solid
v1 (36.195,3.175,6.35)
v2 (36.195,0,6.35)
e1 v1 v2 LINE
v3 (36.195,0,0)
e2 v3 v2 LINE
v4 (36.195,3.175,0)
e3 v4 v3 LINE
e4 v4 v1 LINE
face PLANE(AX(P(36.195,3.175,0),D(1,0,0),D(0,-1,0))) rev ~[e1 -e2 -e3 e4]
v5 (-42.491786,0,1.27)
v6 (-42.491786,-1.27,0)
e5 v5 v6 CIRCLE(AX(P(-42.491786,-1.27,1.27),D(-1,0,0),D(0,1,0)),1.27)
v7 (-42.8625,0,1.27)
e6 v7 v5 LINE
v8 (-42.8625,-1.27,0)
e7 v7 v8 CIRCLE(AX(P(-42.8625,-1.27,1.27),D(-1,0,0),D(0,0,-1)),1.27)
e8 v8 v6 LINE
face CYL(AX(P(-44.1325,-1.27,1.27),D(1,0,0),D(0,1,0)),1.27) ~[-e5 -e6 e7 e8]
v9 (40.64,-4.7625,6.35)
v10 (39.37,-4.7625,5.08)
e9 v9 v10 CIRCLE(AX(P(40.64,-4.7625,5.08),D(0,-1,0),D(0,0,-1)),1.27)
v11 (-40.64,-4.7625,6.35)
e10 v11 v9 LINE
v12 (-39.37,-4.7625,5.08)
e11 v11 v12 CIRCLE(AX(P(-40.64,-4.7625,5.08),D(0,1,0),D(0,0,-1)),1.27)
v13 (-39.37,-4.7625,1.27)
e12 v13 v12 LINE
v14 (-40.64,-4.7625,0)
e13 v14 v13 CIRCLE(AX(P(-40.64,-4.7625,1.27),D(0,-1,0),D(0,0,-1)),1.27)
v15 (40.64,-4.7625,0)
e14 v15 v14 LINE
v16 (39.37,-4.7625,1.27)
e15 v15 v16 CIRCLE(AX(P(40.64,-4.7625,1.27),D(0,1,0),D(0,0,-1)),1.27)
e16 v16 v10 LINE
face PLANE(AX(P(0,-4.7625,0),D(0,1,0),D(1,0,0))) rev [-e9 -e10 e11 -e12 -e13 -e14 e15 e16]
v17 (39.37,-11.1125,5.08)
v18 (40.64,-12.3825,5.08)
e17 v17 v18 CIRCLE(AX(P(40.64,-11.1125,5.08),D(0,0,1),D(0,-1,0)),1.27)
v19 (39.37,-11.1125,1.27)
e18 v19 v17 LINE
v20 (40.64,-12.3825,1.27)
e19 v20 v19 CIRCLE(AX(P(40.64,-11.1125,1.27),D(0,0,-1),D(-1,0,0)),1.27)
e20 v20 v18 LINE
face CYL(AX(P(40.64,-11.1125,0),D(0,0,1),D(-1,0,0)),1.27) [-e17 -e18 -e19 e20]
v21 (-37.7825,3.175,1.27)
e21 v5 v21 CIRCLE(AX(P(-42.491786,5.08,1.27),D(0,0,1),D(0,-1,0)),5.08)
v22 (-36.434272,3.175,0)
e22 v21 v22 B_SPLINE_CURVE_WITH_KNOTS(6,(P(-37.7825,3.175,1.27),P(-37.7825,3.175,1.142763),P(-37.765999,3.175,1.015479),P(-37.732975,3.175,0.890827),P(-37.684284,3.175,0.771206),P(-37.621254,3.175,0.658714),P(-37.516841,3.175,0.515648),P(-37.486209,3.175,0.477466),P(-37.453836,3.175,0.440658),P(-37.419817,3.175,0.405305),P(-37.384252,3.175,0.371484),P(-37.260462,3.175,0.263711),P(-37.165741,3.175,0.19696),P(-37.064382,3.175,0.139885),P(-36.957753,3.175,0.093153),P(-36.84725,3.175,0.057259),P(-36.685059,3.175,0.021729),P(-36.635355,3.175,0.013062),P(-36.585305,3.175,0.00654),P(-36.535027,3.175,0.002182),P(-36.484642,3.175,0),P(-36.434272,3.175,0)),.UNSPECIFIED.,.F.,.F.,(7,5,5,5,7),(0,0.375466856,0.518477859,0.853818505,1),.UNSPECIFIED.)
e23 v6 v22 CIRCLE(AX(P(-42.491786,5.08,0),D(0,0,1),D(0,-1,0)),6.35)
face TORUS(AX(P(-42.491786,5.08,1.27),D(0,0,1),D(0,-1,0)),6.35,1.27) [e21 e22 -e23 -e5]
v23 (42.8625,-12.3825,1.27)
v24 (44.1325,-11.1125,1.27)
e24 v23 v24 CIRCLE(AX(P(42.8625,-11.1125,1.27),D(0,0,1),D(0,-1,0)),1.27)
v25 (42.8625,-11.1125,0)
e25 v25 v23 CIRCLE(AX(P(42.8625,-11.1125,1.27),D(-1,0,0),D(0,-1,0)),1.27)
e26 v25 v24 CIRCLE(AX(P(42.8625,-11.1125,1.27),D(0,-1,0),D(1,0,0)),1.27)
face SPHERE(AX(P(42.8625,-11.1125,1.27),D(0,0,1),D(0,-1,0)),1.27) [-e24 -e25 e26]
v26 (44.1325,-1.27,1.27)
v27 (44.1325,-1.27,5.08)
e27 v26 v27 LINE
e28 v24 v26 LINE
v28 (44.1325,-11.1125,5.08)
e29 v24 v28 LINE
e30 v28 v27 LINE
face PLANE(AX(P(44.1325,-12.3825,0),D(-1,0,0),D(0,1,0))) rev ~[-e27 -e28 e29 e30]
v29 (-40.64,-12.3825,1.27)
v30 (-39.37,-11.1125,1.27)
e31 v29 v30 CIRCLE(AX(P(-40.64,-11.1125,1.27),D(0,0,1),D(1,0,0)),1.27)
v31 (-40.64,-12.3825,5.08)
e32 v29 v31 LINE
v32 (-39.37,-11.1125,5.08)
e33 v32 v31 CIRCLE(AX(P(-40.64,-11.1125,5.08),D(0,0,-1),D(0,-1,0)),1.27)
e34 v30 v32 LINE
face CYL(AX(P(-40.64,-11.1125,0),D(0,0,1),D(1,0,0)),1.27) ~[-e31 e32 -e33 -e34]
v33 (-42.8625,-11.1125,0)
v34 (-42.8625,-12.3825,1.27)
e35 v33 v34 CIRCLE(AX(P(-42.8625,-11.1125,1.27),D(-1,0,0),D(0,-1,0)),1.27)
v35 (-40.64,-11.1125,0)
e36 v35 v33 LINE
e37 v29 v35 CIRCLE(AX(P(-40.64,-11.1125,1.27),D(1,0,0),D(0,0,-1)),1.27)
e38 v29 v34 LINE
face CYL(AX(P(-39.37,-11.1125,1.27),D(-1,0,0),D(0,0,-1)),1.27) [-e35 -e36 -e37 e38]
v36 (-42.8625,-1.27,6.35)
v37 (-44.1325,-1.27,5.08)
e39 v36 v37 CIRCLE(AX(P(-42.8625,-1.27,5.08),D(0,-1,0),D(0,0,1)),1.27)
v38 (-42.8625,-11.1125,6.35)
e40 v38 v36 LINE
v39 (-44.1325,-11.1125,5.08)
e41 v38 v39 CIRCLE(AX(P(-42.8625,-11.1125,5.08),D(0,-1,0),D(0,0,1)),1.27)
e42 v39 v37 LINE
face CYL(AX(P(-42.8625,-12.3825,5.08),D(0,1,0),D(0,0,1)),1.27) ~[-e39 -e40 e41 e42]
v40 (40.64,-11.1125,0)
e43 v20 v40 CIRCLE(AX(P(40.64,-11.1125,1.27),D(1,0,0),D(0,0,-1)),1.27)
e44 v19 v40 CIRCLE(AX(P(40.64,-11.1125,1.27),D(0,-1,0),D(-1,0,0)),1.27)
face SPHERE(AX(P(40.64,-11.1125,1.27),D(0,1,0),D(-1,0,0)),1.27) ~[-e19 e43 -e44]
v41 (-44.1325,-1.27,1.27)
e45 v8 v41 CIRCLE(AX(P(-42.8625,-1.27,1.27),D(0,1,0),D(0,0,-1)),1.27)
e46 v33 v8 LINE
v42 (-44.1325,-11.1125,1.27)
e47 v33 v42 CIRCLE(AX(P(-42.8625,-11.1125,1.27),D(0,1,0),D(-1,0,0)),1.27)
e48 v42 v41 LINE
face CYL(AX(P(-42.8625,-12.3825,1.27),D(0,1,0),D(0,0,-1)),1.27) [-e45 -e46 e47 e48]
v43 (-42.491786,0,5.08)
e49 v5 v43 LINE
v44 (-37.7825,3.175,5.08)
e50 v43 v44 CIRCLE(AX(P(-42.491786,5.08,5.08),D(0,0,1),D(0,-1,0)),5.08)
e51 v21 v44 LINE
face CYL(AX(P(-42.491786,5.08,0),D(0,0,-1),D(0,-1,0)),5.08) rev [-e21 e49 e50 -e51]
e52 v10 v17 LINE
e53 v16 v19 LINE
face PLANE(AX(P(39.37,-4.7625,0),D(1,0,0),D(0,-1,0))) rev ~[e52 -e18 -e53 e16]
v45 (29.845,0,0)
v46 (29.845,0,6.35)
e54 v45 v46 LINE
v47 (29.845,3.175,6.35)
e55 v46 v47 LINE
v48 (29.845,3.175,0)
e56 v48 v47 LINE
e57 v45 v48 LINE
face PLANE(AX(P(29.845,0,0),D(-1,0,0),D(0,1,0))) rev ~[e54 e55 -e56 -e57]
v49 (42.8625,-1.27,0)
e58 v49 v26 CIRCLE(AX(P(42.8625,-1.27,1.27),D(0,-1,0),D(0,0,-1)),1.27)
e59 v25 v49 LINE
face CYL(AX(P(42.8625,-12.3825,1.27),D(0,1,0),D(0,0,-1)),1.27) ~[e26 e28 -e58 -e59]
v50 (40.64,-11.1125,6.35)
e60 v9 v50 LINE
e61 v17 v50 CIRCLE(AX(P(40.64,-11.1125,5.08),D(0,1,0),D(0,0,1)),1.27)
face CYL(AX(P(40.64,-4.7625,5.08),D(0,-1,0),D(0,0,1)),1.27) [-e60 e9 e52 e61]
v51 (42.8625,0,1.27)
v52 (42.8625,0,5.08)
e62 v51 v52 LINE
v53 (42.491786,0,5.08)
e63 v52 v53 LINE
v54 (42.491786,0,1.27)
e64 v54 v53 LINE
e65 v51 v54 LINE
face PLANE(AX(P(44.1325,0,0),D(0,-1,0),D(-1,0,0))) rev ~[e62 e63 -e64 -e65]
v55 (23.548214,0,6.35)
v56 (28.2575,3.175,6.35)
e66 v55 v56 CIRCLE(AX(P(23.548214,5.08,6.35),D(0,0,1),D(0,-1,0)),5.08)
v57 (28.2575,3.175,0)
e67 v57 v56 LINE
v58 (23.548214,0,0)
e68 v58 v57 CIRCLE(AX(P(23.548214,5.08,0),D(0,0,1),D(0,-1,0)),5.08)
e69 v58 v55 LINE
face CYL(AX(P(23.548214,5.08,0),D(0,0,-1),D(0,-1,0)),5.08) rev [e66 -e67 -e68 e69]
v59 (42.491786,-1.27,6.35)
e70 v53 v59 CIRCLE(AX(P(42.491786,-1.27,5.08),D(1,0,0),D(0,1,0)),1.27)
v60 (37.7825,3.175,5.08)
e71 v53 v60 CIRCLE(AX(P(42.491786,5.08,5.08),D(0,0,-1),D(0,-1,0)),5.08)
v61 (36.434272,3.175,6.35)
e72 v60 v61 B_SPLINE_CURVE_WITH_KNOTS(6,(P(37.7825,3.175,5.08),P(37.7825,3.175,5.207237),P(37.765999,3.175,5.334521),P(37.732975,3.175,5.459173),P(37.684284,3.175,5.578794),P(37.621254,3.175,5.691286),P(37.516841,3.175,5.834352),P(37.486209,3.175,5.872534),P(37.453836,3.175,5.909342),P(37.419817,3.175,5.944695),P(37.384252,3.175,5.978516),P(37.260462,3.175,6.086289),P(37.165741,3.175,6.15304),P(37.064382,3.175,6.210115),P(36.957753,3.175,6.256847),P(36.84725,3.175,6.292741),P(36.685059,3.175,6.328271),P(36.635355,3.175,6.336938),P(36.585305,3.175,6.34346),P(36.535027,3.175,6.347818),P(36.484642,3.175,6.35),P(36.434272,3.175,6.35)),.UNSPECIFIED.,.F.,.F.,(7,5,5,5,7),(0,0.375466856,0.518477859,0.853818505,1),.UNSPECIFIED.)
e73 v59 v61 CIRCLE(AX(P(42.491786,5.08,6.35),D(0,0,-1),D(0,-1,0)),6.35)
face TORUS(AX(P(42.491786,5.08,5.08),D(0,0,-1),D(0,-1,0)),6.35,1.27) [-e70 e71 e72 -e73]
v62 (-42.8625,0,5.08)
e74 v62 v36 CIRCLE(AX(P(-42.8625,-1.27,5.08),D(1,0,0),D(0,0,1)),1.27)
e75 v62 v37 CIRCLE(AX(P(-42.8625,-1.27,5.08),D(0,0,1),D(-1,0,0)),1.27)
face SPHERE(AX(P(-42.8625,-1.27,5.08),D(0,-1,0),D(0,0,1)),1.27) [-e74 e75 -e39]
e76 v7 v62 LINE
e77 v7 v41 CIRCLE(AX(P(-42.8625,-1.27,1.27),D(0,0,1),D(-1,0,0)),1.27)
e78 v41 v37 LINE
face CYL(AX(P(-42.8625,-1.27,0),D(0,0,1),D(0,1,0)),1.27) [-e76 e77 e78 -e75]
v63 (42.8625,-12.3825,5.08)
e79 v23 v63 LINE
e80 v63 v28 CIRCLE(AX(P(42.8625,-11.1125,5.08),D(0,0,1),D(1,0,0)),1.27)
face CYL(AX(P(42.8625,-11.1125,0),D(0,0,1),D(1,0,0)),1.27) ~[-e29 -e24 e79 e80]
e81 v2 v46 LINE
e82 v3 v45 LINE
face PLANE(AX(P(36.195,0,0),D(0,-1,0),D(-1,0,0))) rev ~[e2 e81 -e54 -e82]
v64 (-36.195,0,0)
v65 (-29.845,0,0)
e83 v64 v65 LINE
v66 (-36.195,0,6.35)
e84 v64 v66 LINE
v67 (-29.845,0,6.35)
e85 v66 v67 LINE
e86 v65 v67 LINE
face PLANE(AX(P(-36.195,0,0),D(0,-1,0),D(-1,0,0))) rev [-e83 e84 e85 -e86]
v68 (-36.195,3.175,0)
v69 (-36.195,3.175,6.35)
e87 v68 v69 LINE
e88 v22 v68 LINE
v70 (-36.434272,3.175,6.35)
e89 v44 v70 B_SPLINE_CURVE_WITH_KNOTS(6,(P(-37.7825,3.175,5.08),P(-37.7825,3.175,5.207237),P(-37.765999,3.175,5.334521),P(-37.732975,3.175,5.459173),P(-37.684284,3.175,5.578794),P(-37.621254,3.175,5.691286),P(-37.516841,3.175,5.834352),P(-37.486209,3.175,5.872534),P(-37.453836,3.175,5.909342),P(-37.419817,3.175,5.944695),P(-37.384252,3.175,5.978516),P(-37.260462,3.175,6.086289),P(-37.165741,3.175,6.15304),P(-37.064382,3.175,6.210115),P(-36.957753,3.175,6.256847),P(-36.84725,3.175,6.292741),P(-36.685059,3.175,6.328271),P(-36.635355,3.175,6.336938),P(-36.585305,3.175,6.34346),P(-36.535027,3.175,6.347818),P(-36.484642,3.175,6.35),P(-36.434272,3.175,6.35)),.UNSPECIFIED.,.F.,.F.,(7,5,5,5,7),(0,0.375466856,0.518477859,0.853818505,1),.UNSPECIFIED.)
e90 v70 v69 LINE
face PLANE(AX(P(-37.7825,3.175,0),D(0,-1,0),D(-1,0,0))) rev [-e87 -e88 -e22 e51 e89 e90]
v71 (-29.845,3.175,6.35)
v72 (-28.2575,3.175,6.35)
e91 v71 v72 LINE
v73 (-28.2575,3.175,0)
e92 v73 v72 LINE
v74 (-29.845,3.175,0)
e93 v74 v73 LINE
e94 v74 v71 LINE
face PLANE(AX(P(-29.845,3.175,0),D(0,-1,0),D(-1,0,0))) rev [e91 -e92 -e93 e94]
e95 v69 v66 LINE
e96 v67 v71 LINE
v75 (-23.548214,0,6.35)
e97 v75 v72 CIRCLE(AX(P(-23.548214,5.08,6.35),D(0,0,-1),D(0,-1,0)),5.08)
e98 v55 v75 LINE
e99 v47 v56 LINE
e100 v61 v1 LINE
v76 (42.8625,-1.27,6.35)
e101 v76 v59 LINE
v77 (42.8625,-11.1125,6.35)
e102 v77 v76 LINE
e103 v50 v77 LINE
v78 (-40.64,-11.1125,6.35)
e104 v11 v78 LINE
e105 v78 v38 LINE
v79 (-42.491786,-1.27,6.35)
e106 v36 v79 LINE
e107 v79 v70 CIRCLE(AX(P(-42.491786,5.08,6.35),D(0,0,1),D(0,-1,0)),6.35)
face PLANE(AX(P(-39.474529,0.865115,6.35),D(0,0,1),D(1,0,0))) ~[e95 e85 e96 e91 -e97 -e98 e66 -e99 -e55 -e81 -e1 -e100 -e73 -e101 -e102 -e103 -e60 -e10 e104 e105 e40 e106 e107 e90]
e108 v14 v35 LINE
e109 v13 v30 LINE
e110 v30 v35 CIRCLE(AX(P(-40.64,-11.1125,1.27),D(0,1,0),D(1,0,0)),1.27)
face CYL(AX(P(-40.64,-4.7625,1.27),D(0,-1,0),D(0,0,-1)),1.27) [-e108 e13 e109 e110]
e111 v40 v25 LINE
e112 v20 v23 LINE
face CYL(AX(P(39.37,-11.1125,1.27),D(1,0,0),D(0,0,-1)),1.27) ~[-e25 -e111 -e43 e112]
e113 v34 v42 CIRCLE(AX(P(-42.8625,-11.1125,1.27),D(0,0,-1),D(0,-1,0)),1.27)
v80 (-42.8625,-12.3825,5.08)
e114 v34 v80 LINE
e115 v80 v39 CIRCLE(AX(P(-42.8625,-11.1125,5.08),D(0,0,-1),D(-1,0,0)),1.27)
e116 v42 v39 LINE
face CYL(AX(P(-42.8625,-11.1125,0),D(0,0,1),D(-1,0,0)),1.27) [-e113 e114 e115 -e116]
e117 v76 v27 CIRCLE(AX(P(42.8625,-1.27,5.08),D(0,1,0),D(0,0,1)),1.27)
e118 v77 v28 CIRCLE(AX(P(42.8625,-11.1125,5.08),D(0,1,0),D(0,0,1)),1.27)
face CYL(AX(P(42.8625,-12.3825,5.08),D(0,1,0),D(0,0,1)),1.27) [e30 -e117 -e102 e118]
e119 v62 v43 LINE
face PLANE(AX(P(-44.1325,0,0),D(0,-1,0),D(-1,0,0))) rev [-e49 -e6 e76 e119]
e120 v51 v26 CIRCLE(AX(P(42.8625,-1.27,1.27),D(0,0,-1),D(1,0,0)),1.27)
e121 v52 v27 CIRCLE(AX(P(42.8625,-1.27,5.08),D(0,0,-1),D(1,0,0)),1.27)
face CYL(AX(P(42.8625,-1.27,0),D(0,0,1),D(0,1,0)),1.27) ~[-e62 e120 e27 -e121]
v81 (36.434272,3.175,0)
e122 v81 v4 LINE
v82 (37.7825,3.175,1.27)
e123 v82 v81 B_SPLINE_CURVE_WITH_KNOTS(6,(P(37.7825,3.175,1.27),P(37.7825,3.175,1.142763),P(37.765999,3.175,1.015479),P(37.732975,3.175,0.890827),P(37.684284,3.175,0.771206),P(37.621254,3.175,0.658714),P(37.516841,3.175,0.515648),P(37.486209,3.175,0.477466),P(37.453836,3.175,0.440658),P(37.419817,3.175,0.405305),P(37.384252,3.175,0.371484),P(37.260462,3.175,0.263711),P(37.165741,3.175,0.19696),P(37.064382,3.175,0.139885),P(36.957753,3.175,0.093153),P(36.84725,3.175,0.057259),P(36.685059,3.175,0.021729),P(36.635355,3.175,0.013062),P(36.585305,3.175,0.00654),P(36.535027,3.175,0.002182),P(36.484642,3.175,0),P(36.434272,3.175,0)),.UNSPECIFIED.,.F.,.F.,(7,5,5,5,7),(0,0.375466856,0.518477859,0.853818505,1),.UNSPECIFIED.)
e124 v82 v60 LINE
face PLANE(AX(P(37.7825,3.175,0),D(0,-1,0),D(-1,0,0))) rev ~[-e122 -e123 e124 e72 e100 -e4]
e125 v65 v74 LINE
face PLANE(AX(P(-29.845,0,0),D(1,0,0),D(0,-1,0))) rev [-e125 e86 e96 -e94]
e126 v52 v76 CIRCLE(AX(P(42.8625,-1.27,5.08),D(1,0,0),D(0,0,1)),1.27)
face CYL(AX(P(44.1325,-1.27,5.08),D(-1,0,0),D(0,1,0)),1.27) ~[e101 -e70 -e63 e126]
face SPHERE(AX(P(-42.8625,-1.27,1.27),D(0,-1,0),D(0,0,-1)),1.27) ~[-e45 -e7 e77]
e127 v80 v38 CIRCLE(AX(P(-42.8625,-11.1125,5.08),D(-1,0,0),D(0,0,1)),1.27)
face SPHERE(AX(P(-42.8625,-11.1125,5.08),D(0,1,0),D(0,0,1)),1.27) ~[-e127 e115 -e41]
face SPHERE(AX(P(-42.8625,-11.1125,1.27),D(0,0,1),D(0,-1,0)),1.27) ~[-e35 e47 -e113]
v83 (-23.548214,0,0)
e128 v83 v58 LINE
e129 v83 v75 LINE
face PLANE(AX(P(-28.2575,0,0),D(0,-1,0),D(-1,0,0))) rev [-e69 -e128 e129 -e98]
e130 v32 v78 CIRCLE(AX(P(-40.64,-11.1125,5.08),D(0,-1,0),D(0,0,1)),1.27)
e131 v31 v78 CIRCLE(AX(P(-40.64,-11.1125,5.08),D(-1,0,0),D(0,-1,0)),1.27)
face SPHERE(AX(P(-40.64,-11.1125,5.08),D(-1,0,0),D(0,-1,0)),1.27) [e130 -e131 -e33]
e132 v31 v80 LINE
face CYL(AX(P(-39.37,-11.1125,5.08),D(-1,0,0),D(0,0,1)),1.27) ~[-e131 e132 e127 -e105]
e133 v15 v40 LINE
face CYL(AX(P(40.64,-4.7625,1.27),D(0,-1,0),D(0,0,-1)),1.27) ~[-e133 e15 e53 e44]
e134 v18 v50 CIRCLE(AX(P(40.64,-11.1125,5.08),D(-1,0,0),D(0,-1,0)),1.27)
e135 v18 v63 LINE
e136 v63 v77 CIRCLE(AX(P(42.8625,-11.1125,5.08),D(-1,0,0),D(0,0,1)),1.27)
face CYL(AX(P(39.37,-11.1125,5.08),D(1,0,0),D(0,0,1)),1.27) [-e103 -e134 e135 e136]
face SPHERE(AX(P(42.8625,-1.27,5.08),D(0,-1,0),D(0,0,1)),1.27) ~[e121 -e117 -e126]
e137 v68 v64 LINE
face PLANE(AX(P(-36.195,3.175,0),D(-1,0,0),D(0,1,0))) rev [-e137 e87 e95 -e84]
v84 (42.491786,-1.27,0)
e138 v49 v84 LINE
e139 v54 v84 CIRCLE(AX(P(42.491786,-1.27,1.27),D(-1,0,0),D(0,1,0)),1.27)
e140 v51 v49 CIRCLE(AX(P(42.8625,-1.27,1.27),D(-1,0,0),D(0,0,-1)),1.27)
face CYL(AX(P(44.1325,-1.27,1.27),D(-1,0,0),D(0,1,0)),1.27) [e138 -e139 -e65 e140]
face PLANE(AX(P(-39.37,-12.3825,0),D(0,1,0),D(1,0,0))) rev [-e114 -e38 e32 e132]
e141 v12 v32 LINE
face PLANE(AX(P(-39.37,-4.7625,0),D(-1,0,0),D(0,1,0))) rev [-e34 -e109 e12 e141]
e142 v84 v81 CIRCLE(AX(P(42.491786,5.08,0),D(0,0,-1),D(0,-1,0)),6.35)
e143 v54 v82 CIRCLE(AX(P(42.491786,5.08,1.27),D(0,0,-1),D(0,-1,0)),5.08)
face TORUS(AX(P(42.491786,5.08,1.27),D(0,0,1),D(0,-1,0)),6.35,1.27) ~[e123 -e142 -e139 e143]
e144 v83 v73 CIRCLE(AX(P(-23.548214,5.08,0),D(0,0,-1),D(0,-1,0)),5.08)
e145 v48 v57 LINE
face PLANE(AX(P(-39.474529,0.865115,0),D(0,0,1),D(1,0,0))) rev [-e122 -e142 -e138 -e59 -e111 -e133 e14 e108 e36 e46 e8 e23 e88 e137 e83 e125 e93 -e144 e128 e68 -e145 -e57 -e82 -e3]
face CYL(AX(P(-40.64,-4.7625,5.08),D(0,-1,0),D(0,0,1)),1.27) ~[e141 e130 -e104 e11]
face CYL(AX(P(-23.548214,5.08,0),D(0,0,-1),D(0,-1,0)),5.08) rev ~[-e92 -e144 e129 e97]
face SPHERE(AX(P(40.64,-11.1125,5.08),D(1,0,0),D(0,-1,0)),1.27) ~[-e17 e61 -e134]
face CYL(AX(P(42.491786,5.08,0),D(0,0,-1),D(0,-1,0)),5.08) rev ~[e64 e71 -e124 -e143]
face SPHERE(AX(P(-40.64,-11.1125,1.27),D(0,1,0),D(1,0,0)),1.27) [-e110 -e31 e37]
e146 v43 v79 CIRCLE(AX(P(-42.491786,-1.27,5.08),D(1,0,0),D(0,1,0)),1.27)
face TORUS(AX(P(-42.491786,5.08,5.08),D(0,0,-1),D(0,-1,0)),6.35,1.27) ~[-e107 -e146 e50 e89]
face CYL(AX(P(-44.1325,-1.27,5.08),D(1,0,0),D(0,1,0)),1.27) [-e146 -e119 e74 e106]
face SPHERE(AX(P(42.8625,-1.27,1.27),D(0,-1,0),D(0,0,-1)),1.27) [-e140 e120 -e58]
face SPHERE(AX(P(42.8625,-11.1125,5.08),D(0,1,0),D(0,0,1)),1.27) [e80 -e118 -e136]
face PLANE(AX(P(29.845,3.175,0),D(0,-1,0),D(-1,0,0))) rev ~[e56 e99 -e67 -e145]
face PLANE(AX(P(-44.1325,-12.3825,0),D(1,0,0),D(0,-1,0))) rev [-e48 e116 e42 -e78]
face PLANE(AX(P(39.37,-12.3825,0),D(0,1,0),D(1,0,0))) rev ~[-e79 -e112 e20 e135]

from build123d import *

# Parameters (mm, degrees)
F1_DEPTH    = 6.35
F2_T1_DEPTH = 6.35
F3_R        = 1.27


# Not quite as in the source:
# - a fillet or chamfer that OpenCascade refuses, or shapes differently, is made with other operations: its cross-section is extruded or revolved along the edge and cut away or added


with BuildPart() as f1:
    # F0 (on Top) → F1 (new body)
    with BuildSketch(Plane.XY):
        Polygon((28.2575, 0), (0, 0), (0, -4.7625), (39.37, -4.7625), (39.37, -12.3825), (44.1325, -12.3825), (44.1325, 0), (37.7825, 0), (37.7825, 3.175), (36.195, 3.175), (36.195, 0), (29.845, 0), (29.845, 3.175), (28.2575, 3.175), align=None)
    extrude(amount=F1_DEPTH)

    # F2: fillet of radius 5.08 on 2 edges, made by hand

    # F2_s2 → F2_t1 (join)
    with BuildSketch(Plane.XY):
        with BuildLine():
            ThreePointArc((42.4917860393, 0), (39.6519797079, 0.8678865162), (37.7825, 3.175))
            Line((37.7825, 3.175), (37.7825, 0))
            Line((37.7825, 0), (42.4917860393, 0))
        make_face()
        with BuildLine():
            ThreePointArc((23.5482139607, 0), (26.3880202921, 0.8678865162), (28.2575, 3.175))
            Line((28.2575, 3.175), (28.2575, 0))
            Line((28.2575, 0), (23.5482139607, 0))
        make_face()
    extrude(amount=F2_T1_DEPTH)

    # F3
    f3_edges = [f1.edges().sort_by_distance(p)[0] for p in [
        (39.37, -8.5725, 0),
        (44.1325, -6.19125, 6.35),
        (41.75125, -12.3825, 6.35),
        (44.1325, -12.3825, 3.175),
        (39.37, -12.3825, 3.175),
        (41.75125, -12.3825, 0),
        (39.37, -8.5725, 6.35),
        (44.1325, -6.19125, 0),
        (39.65198, 0.867887, 6.35),
        (39.65198, 0.867887, 0),
        (43.312143, 0, 6.35),
        (43.312143, 0, 0),
        (44.1325, 0, 3.175),
    ]]
    fillet(f3_edges, radius=F3_R)

    # F4: F1 across plane


with BuildPart() as f1_1:
    add(f1.part)
    add(f1.part.mirror(Plane.YZ))


solid = f1_1.part
